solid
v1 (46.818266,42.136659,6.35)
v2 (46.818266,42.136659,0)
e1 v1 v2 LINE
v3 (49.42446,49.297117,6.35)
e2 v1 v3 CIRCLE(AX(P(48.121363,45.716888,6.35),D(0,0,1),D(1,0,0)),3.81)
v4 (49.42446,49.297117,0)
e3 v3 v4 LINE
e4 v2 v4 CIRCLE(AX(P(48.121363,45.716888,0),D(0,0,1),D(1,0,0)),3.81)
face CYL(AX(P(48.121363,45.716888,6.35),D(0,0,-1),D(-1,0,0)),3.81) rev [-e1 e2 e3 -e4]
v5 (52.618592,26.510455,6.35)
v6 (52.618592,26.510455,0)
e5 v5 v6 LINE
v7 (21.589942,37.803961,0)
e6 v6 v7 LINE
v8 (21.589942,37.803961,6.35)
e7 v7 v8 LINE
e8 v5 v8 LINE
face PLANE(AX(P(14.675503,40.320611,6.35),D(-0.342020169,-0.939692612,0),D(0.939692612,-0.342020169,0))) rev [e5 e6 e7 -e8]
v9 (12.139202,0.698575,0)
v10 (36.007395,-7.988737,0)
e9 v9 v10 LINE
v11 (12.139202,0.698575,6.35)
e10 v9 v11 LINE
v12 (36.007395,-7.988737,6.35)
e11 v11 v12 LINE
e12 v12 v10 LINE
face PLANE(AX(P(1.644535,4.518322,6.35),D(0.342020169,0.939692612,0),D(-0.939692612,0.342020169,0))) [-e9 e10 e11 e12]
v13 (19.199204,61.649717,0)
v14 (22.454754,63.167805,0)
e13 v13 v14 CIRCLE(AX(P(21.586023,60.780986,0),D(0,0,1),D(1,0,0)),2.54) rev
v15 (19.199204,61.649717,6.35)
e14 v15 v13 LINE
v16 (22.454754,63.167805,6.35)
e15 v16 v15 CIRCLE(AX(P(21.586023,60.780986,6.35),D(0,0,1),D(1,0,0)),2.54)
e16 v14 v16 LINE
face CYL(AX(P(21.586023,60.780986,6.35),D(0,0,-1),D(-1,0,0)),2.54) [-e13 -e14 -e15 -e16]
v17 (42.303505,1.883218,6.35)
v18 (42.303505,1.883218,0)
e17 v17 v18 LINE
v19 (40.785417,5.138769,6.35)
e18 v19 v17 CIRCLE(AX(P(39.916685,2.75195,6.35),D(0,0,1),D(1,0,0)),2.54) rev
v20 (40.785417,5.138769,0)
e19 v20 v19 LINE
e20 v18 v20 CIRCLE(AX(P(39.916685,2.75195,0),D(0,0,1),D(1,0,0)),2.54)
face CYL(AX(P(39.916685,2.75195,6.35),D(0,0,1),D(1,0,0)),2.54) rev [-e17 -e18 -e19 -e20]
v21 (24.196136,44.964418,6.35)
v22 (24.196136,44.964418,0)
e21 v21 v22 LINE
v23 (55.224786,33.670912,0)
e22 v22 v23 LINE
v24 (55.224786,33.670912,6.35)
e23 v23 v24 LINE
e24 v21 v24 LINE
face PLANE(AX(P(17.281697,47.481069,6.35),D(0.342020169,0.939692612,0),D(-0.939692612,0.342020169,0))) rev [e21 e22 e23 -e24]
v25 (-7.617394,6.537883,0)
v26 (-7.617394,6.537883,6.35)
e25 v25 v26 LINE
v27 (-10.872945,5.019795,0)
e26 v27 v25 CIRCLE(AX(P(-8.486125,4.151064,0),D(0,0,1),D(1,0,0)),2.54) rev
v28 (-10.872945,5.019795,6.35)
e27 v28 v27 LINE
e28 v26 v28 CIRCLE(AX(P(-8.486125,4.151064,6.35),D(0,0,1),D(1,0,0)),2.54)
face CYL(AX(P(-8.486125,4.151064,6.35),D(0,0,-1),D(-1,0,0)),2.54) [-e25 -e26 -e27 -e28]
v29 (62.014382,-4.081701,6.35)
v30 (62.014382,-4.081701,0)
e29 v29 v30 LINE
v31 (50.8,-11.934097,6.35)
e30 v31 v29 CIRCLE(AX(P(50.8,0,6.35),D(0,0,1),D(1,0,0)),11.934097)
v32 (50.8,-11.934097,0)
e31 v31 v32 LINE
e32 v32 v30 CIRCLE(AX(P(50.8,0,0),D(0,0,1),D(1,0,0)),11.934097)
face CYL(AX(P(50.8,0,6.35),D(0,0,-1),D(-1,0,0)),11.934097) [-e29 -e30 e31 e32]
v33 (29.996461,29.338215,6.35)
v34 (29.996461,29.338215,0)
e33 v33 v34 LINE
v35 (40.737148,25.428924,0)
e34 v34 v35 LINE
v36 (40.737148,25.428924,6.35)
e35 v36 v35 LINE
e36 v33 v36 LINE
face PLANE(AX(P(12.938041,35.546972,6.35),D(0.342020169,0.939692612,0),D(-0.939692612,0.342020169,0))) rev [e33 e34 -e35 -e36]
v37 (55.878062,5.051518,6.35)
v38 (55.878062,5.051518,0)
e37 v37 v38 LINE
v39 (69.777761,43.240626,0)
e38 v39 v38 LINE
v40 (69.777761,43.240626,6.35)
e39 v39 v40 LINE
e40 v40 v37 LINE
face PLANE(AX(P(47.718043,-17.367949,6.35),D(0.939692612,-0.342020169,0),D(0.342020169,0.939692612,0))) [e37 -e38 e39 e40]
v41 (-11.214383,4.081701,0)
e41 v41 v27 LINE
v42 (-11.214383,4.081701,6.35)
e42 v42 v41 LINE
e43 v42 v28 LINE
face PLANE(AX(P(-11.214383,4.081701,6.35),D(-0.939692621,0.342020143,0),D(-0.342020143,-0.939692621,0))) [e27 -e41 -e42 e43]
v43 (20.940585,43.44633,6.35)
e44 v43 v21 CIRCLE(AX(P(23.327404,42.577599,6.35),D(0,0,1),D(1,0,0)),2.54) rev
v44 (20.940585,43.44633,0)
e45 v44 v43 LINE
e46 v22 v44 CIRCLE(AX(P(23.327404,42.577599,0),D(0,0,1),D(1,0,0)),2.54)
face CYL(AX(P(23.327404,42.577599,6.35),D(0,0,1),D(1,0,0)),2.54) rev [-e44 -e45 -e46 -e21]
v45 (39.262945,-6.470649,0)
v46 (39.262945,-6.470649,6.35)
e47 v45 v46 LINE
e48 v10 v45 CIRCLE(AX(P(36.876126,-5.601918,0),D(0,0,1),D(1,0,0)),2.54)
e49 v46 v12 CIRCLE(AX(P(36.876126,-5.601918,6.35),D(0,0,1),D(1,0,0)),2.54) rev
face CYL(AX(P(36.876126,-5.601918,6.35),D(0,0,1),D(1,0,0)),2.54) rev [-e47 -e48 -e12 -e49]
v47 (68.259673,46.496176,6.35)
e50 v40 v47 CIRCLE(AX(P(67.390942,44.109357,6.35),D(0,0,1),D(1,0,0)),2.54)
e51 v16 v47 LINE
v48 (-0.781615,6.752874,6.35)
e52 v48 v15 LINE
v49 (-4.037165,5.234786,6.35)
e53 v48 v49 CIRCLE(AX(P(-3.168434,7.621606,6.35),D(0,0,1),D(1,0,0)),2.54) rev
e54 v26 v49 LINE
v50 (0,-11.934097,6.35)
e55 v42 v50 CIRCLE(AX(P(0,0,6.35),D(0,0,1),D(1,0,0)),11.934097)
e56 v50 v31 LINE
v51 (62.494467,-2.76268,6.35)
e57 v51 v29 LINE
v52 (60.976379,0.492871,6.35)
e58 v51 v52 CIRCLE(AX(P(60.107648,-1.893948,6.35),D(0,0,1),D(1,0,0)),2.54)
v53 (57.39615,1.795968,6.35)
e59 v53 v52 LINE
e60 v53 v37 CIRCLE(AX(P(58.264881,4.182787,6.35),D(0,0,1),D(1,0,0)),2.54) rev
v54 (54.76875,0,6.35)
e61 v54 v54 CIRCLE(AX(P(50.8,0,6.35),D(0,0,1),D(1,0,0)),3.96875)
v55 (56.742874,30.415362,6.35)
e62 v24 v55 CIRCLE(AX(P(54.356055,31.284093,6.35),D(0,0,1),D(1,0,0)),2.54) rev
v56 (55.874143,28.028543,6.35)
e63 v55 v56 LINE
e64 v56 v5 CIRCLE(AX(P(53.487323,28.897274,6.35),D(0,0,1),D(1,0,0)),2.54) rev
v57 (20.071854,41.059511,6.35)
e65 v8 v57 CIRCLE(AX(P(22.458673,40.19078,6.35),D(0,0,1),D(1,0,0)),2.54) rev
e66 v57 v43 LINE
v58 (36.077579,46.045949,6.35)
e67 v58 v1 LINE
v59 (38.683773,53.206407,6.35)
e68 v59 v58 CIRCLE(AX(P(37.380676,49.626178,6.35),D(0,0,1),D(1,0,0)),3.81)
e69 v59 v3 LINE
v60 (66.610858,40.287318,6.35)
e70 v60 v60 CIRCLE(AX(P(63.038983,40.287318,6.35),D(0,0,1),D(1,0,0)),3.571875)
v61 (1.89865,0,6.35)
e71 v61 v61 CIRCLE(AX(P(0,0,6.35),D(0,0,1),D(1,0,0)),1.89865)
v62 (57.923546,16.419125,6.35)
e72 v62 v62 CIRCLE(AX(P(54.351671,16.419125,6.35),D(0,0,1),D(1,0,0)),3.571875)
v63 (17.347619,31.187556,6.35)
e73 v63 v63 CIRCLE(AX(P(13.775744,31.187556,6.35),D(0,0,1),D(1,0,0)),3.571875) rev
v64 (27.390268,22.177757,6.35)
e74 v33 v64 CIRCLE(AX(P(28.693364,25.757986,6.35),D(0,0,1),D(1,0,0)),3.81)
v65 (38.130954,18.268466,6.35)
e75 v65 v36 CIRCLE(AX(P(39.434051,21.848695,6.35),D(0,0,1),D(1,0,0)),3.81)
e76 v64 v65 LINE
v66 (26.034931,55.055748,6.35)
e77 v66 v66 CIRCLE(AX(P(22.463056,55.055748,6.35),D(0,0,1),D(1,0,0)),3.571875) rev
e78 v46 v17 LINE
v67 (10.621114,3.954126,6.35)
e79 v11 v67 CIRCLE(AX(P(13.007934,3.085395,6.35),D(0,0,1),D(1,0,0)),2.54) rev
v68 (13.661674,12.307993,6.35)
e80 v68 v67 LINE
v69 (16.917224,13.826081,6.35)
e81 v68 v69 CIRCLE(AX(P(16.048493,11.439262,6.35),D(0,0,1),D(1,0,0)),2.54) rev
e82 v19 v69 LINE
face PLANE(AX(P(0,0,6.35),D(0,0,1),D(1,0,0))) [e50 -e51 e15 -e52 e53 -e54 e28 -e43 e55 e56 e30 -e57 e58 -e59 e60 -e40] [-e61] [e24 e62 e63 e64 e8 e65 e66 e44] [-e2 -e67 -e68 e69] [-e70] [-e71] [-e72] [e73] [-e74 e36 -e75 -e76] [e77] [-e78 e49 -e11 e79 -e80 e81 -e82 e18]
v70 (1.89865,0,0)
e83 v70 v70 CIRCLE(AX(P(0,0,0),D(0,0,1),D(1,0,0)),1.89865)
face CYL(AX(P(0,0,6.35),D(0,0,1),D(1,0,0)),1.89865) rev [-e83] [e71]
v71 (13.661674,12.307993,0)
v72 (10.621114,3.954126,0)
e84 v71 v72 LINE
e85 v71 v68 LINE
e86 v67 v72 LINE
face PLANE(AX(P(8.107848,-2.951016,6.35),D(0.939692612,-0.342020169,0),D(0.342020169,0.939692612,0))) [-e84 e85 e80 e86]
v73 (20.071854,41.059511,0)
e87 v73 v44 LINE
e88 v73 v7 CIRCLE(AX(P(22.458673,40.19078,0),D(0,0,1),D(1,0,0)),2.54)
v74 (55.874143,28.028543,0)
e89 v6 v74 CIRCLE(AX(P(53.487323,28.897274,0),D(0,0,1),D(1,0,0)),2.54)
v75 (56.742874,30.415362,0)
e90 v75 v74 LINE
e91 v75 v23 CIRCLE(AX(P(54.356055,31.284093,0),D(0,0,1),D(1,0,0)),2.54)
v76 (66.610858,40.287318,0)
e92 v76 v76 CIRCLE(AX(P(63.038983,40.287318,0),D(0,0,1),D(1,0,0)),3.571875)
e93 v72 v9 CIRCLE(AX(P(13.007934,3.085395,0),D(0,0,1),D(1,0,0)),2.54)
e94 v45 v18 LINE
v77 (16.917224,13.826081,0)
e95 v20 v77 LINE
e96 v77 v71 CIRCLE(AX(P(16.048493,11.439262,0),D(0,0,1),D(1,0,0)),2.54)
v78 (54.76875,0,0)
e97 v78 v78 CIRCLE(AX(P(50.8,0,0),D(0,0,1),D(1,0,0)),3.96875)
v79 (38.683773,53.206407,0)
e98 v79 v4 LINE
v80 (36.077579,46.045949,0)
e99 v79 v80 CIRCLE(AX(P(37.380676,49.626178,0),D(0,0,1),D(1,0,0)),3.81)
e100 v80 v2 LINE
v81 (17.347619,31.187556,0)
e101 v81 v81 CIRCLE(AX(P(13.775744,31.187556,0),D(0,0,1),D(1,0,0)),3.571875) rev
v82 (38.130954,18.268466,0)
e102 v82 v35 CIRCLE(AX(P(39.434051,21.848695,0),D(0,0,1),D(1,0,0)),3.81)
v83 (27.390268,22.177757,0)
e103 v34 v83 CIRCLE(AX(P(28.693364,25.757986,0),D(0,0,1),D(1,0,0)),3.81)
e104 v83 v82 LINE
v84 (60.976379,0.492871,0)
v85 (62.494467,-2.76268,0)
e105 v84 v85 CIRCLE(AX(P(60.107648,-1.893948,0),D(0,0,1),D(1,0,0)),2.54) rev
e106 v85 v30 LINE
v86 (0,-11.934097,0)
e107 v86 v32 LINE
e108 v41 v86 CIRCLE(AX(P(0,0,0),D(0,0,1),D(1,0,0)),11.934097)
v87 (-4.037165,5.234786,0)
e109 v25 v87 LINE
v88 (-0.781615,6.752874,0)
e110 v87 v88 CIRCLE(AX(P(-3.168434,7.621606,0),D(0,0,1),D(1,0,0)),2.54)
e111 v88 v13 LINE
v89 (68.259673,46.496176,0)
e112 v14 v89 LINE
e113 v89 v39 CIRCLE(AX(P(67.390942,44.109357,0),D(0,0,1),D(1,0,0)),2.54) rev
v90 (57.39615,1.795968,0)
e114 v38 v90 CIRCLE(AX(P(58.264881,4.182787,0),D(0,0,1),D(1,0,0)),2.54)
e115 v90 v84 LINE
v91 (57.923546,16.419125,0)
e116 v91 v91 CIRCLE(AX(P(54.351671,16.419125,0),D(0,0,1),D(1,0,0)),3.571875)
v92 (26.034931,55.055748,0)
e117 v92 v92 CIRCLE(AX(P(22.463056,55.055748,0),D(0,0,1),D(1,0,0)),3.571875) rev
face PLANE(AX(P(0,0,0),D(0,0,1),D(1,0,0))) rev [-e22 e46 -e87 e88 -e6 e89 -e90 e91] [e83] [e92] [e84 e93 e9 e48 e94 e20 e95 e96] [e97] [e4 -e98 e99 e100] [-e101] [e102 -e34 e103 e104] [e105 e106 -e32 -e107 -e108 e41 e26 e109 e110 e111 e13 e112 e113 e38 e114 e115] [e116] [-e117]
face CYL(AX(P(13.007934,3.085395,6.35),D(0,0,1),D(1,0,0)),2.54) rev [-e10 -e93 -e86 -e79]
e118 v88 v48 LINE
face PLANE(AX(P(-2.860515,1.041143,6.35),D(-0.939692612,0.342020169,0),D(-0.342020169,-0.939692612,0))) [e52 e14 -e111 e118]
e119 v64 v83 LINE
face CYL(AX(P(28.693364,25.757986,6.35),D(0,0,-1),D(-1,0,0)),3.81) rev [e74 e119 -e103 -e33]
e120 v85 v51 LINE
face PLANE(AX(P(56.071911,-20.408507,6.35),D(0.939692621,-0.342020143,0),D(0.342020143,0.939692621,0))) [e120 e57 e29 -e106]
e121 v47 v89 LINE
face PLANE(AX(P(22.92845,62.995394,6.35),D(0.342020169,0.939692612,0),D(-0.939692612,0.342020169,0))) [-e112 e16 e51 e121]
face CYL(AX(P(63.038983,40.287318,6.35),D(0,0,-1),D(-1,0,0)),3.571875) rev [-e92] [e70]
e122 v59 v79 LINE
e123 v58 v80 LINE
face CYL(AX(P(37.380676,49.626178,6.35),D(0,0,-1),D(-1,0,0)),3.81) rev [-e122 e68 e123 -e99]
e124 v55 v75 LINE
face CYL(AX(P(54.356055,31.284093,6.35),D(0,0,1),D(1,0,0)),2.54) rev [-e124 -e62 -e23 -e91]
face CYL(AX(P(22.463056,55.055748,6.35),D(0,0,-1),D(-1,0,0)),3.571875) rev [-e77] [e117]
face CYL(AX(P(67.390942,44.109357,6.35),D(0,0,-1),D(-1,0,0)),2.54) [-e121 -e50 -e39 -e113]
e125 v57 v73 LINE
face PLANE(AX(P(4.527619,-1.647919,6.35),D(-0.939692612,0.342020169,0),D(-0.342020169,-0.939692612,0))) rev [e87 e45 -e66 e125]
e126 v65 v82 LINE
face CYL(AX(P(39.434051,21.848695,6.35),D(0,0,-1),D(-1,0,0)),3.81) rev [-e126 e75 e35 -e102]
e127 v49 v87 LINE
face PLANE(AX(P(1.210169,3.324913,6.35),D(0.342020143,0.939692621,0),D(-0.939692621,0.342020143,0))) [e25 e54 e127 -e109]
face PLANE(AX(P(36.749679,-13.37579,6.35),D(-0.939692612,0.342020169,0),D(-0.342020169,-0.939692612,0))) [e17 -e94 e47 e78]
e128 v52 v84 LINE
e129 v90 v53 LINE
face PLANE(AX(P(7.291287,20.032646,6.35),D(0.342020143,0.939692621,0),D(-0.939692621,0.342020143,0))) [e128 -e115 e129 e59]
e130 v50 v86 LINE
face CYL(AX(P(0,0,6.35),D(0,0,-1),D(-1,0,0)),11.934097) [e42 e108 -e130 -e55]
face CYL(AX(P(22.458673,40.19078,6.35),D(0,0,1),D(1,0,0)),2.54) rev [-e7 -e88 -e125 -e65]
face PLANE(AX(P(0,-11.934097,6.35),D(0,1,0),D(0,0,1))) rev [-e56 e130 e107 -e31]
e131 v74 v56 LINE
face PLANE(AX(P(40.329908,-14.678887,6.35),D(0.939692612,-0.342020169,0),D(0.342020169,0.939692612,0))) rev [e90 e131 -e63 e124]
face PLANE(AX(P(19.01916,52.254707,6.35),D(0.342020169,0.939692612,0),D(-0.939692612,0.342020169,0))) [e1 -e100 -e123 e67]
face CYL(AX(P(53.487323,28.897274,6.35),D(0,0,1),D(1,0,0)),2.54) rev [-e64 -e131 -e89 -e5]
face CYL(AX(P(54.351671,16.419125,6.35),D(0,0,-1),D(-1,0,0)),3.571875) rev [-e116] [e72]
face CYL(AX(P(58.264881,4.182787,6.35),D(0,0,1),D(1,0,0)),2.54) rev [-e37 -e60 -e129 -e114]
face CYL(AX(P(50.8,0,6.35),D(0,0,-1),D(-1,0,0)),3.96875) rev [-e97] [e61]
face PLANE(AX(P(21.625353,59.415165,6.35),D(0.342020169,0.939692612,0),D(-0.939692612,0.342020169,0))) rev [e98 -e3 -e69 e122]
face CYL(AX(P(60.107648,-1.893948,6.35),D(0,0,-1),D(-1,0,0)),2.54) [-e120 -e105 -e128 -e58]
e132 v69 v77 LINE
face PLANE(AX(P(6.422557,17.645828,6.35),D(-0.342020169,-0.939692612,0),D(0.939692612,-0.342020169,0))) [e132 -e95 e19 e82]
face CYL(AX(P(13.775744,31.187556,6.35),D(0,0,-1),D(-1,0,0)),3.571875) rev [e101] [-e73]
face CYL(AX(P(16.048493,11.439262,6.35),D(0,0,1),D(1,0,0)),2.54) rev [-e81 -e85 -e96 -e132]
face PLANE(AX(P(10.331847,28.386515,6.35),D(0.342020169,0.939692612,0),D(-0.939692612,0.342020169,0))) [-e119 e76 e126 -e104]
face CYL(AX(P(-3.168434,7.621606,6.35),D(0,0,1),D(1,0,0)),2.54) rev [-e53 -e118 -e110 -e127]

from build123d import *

# Parameters (mm, degrees)
SKETCH_1_R             = 3.96875
SKETCH_1_R_2           = 3.571875
BOSS_EXTRUDE1_DEPTH    = 6.35
FILLET1_R              = 2.54
F_10_24_TAPPED_HOLE1_D = 3.7973


with BuildPart() as part:
    # 草图1 → Boss-Extrude1 (new body)
    with BuildSketch(Plane.XY):
        with BuildLine():
            Line((-10.004213371, 7.406614284), (-11.214382662, 4.081701485))
            ThreePointArc((-11.214382662, 4.081701485), (-9.775839758, -6.845116691), (0, -11.934096761))
            Line((0, -11.934096761), (50.8, -11.934096761))
            ThreePointArc((50.8, -11.934096761), (57.645116629, -9.775839801), (62.014382214, -4.081701322))
            Line((62.014382214, -4.081701322), (63.363198014, -0.375860367))
            Line((63.363198014, -0.375860367), (55.009330616, 2.664698708))
            Line((55.009330616, 2.664698708), (70.64649272, 45.627444911))
            Line((70.64649272, 45.627444911), (20.067934728, 64.036536047))
            Line((20.067934728, 64.036536047), (-1.650345972, 4.36605521))
            Line((-1.650345972, 4.36605521), (-10.004213371, 7.406614284))
        make_face()
        Polygon((9.752383236, 1.567306626), (14.530404991, 14.694812411), (43.172235793, 4.270037674), (38.394214039, -8.85746811), align=None, mode=Mode.SUBTRACT)
        with Locations((50.8, 0)):
            Circle(SKETCH_1_R, mode=Mode.SUBTRACT)
        with BuildLine():
            ThreePointArc((27.390267642, 22.177756856), (25.113135634, 27.061082549), (29.996461326, 29.338214557))
            Line((29.996461326, 29.338214557), (40.737147877, 25.428924031))
            ThreePointArc((40.737147877, 25.428924031), (43.014279885, 20.545598338), (38.130954193, 18.26846633))
            Line((38.130954193, 18.26846633), (27.390267642, 22.177756856))
        make_face(mode=Mode.SUBTRACT)
        with Locations((54.351671245, 16.419125005)):
            Circle(SKETCH_1_R_2, mode=Mode.SUBTRACT)
        with Locations((13.775744275, 31.187555882)):
            Circle(SKETCH_1_R_2, mode=Mode.SUBTRACT)
        with Locations((22.463055915, 55.05574845)):
            Circle(SKETCH_1_R_2, mode=Mode.SUBTRACT)
        Polygon((19.203122807, 38.672691971), (21.809316491, 45.833149672), (57.611604993, 32.802181251), (55.005411309, 25.641723551), align=None, mode=Mode.SUBTRACT)
        with Locations((63.038982885, 40.287317573)):
            Circle(SKETCH_1_R_2, mode=Mode.SUBTRACT)
        with BuildLine():
            Line((46.818265834, 42.136658898), (36.077579283, 46.045949424))
            ThreePointArc((36.077579283, 46.045949424), (33.800447275, 50.929275117), (38.683772967, 53.206407125))
            Line((38.683772967, 53.206407125), (49.424459518, 49.297116599))
            ThreePointArc((49.424459518, 49.297116599), (51.701591526, 44.413790906), (46.818265834, 42.136658898))
        make_face(mode=Mode.SUBTRACT)
    extrude(amount=BOSS_EXTRUDE1_DEPTH)

    # Fillet1
    fillet1_edges = [part.edges().sort_by_distance(p)[0] for p in [
        (43.172235793, 4.270037674, 3.175),
        (38.394214039, -8.85746811, 3.175),
        (9.752383236, 1.567306626, 3.175),
        (14.530404991, 14.694812411, 3.175),
        (-1.650345972, 4.36605521, 3.175),
        (55.009330616, 2.664698708, 3.175),
        (55.005411309, 25.641723551, 3.175),
        (57.611604993, 32.802181251, 3.175),
        (19.203122807, 38.672691971, 3.175),
        (21.809316491, 45.833149672, 3.175),
        (70.64649272, 45.627444911, 3.175),
        (20.067934728, 64.036536047, 3.175),
        (-10.004213371, 7.406614284, 3.175),
        (63.363198014, -0.375860367, 3.175),
    ]]
    fillet(fillet1_edges, radius=FILLET1_R)

    # #10-24 Tapped Hole1 (through all)
    with Locations(Plane.XY.offset(6.35)):
        with Locations((0, 0)):
            Hole(F_10_24_TAPPED_HOLE1_D / 2)


solid = part.part
